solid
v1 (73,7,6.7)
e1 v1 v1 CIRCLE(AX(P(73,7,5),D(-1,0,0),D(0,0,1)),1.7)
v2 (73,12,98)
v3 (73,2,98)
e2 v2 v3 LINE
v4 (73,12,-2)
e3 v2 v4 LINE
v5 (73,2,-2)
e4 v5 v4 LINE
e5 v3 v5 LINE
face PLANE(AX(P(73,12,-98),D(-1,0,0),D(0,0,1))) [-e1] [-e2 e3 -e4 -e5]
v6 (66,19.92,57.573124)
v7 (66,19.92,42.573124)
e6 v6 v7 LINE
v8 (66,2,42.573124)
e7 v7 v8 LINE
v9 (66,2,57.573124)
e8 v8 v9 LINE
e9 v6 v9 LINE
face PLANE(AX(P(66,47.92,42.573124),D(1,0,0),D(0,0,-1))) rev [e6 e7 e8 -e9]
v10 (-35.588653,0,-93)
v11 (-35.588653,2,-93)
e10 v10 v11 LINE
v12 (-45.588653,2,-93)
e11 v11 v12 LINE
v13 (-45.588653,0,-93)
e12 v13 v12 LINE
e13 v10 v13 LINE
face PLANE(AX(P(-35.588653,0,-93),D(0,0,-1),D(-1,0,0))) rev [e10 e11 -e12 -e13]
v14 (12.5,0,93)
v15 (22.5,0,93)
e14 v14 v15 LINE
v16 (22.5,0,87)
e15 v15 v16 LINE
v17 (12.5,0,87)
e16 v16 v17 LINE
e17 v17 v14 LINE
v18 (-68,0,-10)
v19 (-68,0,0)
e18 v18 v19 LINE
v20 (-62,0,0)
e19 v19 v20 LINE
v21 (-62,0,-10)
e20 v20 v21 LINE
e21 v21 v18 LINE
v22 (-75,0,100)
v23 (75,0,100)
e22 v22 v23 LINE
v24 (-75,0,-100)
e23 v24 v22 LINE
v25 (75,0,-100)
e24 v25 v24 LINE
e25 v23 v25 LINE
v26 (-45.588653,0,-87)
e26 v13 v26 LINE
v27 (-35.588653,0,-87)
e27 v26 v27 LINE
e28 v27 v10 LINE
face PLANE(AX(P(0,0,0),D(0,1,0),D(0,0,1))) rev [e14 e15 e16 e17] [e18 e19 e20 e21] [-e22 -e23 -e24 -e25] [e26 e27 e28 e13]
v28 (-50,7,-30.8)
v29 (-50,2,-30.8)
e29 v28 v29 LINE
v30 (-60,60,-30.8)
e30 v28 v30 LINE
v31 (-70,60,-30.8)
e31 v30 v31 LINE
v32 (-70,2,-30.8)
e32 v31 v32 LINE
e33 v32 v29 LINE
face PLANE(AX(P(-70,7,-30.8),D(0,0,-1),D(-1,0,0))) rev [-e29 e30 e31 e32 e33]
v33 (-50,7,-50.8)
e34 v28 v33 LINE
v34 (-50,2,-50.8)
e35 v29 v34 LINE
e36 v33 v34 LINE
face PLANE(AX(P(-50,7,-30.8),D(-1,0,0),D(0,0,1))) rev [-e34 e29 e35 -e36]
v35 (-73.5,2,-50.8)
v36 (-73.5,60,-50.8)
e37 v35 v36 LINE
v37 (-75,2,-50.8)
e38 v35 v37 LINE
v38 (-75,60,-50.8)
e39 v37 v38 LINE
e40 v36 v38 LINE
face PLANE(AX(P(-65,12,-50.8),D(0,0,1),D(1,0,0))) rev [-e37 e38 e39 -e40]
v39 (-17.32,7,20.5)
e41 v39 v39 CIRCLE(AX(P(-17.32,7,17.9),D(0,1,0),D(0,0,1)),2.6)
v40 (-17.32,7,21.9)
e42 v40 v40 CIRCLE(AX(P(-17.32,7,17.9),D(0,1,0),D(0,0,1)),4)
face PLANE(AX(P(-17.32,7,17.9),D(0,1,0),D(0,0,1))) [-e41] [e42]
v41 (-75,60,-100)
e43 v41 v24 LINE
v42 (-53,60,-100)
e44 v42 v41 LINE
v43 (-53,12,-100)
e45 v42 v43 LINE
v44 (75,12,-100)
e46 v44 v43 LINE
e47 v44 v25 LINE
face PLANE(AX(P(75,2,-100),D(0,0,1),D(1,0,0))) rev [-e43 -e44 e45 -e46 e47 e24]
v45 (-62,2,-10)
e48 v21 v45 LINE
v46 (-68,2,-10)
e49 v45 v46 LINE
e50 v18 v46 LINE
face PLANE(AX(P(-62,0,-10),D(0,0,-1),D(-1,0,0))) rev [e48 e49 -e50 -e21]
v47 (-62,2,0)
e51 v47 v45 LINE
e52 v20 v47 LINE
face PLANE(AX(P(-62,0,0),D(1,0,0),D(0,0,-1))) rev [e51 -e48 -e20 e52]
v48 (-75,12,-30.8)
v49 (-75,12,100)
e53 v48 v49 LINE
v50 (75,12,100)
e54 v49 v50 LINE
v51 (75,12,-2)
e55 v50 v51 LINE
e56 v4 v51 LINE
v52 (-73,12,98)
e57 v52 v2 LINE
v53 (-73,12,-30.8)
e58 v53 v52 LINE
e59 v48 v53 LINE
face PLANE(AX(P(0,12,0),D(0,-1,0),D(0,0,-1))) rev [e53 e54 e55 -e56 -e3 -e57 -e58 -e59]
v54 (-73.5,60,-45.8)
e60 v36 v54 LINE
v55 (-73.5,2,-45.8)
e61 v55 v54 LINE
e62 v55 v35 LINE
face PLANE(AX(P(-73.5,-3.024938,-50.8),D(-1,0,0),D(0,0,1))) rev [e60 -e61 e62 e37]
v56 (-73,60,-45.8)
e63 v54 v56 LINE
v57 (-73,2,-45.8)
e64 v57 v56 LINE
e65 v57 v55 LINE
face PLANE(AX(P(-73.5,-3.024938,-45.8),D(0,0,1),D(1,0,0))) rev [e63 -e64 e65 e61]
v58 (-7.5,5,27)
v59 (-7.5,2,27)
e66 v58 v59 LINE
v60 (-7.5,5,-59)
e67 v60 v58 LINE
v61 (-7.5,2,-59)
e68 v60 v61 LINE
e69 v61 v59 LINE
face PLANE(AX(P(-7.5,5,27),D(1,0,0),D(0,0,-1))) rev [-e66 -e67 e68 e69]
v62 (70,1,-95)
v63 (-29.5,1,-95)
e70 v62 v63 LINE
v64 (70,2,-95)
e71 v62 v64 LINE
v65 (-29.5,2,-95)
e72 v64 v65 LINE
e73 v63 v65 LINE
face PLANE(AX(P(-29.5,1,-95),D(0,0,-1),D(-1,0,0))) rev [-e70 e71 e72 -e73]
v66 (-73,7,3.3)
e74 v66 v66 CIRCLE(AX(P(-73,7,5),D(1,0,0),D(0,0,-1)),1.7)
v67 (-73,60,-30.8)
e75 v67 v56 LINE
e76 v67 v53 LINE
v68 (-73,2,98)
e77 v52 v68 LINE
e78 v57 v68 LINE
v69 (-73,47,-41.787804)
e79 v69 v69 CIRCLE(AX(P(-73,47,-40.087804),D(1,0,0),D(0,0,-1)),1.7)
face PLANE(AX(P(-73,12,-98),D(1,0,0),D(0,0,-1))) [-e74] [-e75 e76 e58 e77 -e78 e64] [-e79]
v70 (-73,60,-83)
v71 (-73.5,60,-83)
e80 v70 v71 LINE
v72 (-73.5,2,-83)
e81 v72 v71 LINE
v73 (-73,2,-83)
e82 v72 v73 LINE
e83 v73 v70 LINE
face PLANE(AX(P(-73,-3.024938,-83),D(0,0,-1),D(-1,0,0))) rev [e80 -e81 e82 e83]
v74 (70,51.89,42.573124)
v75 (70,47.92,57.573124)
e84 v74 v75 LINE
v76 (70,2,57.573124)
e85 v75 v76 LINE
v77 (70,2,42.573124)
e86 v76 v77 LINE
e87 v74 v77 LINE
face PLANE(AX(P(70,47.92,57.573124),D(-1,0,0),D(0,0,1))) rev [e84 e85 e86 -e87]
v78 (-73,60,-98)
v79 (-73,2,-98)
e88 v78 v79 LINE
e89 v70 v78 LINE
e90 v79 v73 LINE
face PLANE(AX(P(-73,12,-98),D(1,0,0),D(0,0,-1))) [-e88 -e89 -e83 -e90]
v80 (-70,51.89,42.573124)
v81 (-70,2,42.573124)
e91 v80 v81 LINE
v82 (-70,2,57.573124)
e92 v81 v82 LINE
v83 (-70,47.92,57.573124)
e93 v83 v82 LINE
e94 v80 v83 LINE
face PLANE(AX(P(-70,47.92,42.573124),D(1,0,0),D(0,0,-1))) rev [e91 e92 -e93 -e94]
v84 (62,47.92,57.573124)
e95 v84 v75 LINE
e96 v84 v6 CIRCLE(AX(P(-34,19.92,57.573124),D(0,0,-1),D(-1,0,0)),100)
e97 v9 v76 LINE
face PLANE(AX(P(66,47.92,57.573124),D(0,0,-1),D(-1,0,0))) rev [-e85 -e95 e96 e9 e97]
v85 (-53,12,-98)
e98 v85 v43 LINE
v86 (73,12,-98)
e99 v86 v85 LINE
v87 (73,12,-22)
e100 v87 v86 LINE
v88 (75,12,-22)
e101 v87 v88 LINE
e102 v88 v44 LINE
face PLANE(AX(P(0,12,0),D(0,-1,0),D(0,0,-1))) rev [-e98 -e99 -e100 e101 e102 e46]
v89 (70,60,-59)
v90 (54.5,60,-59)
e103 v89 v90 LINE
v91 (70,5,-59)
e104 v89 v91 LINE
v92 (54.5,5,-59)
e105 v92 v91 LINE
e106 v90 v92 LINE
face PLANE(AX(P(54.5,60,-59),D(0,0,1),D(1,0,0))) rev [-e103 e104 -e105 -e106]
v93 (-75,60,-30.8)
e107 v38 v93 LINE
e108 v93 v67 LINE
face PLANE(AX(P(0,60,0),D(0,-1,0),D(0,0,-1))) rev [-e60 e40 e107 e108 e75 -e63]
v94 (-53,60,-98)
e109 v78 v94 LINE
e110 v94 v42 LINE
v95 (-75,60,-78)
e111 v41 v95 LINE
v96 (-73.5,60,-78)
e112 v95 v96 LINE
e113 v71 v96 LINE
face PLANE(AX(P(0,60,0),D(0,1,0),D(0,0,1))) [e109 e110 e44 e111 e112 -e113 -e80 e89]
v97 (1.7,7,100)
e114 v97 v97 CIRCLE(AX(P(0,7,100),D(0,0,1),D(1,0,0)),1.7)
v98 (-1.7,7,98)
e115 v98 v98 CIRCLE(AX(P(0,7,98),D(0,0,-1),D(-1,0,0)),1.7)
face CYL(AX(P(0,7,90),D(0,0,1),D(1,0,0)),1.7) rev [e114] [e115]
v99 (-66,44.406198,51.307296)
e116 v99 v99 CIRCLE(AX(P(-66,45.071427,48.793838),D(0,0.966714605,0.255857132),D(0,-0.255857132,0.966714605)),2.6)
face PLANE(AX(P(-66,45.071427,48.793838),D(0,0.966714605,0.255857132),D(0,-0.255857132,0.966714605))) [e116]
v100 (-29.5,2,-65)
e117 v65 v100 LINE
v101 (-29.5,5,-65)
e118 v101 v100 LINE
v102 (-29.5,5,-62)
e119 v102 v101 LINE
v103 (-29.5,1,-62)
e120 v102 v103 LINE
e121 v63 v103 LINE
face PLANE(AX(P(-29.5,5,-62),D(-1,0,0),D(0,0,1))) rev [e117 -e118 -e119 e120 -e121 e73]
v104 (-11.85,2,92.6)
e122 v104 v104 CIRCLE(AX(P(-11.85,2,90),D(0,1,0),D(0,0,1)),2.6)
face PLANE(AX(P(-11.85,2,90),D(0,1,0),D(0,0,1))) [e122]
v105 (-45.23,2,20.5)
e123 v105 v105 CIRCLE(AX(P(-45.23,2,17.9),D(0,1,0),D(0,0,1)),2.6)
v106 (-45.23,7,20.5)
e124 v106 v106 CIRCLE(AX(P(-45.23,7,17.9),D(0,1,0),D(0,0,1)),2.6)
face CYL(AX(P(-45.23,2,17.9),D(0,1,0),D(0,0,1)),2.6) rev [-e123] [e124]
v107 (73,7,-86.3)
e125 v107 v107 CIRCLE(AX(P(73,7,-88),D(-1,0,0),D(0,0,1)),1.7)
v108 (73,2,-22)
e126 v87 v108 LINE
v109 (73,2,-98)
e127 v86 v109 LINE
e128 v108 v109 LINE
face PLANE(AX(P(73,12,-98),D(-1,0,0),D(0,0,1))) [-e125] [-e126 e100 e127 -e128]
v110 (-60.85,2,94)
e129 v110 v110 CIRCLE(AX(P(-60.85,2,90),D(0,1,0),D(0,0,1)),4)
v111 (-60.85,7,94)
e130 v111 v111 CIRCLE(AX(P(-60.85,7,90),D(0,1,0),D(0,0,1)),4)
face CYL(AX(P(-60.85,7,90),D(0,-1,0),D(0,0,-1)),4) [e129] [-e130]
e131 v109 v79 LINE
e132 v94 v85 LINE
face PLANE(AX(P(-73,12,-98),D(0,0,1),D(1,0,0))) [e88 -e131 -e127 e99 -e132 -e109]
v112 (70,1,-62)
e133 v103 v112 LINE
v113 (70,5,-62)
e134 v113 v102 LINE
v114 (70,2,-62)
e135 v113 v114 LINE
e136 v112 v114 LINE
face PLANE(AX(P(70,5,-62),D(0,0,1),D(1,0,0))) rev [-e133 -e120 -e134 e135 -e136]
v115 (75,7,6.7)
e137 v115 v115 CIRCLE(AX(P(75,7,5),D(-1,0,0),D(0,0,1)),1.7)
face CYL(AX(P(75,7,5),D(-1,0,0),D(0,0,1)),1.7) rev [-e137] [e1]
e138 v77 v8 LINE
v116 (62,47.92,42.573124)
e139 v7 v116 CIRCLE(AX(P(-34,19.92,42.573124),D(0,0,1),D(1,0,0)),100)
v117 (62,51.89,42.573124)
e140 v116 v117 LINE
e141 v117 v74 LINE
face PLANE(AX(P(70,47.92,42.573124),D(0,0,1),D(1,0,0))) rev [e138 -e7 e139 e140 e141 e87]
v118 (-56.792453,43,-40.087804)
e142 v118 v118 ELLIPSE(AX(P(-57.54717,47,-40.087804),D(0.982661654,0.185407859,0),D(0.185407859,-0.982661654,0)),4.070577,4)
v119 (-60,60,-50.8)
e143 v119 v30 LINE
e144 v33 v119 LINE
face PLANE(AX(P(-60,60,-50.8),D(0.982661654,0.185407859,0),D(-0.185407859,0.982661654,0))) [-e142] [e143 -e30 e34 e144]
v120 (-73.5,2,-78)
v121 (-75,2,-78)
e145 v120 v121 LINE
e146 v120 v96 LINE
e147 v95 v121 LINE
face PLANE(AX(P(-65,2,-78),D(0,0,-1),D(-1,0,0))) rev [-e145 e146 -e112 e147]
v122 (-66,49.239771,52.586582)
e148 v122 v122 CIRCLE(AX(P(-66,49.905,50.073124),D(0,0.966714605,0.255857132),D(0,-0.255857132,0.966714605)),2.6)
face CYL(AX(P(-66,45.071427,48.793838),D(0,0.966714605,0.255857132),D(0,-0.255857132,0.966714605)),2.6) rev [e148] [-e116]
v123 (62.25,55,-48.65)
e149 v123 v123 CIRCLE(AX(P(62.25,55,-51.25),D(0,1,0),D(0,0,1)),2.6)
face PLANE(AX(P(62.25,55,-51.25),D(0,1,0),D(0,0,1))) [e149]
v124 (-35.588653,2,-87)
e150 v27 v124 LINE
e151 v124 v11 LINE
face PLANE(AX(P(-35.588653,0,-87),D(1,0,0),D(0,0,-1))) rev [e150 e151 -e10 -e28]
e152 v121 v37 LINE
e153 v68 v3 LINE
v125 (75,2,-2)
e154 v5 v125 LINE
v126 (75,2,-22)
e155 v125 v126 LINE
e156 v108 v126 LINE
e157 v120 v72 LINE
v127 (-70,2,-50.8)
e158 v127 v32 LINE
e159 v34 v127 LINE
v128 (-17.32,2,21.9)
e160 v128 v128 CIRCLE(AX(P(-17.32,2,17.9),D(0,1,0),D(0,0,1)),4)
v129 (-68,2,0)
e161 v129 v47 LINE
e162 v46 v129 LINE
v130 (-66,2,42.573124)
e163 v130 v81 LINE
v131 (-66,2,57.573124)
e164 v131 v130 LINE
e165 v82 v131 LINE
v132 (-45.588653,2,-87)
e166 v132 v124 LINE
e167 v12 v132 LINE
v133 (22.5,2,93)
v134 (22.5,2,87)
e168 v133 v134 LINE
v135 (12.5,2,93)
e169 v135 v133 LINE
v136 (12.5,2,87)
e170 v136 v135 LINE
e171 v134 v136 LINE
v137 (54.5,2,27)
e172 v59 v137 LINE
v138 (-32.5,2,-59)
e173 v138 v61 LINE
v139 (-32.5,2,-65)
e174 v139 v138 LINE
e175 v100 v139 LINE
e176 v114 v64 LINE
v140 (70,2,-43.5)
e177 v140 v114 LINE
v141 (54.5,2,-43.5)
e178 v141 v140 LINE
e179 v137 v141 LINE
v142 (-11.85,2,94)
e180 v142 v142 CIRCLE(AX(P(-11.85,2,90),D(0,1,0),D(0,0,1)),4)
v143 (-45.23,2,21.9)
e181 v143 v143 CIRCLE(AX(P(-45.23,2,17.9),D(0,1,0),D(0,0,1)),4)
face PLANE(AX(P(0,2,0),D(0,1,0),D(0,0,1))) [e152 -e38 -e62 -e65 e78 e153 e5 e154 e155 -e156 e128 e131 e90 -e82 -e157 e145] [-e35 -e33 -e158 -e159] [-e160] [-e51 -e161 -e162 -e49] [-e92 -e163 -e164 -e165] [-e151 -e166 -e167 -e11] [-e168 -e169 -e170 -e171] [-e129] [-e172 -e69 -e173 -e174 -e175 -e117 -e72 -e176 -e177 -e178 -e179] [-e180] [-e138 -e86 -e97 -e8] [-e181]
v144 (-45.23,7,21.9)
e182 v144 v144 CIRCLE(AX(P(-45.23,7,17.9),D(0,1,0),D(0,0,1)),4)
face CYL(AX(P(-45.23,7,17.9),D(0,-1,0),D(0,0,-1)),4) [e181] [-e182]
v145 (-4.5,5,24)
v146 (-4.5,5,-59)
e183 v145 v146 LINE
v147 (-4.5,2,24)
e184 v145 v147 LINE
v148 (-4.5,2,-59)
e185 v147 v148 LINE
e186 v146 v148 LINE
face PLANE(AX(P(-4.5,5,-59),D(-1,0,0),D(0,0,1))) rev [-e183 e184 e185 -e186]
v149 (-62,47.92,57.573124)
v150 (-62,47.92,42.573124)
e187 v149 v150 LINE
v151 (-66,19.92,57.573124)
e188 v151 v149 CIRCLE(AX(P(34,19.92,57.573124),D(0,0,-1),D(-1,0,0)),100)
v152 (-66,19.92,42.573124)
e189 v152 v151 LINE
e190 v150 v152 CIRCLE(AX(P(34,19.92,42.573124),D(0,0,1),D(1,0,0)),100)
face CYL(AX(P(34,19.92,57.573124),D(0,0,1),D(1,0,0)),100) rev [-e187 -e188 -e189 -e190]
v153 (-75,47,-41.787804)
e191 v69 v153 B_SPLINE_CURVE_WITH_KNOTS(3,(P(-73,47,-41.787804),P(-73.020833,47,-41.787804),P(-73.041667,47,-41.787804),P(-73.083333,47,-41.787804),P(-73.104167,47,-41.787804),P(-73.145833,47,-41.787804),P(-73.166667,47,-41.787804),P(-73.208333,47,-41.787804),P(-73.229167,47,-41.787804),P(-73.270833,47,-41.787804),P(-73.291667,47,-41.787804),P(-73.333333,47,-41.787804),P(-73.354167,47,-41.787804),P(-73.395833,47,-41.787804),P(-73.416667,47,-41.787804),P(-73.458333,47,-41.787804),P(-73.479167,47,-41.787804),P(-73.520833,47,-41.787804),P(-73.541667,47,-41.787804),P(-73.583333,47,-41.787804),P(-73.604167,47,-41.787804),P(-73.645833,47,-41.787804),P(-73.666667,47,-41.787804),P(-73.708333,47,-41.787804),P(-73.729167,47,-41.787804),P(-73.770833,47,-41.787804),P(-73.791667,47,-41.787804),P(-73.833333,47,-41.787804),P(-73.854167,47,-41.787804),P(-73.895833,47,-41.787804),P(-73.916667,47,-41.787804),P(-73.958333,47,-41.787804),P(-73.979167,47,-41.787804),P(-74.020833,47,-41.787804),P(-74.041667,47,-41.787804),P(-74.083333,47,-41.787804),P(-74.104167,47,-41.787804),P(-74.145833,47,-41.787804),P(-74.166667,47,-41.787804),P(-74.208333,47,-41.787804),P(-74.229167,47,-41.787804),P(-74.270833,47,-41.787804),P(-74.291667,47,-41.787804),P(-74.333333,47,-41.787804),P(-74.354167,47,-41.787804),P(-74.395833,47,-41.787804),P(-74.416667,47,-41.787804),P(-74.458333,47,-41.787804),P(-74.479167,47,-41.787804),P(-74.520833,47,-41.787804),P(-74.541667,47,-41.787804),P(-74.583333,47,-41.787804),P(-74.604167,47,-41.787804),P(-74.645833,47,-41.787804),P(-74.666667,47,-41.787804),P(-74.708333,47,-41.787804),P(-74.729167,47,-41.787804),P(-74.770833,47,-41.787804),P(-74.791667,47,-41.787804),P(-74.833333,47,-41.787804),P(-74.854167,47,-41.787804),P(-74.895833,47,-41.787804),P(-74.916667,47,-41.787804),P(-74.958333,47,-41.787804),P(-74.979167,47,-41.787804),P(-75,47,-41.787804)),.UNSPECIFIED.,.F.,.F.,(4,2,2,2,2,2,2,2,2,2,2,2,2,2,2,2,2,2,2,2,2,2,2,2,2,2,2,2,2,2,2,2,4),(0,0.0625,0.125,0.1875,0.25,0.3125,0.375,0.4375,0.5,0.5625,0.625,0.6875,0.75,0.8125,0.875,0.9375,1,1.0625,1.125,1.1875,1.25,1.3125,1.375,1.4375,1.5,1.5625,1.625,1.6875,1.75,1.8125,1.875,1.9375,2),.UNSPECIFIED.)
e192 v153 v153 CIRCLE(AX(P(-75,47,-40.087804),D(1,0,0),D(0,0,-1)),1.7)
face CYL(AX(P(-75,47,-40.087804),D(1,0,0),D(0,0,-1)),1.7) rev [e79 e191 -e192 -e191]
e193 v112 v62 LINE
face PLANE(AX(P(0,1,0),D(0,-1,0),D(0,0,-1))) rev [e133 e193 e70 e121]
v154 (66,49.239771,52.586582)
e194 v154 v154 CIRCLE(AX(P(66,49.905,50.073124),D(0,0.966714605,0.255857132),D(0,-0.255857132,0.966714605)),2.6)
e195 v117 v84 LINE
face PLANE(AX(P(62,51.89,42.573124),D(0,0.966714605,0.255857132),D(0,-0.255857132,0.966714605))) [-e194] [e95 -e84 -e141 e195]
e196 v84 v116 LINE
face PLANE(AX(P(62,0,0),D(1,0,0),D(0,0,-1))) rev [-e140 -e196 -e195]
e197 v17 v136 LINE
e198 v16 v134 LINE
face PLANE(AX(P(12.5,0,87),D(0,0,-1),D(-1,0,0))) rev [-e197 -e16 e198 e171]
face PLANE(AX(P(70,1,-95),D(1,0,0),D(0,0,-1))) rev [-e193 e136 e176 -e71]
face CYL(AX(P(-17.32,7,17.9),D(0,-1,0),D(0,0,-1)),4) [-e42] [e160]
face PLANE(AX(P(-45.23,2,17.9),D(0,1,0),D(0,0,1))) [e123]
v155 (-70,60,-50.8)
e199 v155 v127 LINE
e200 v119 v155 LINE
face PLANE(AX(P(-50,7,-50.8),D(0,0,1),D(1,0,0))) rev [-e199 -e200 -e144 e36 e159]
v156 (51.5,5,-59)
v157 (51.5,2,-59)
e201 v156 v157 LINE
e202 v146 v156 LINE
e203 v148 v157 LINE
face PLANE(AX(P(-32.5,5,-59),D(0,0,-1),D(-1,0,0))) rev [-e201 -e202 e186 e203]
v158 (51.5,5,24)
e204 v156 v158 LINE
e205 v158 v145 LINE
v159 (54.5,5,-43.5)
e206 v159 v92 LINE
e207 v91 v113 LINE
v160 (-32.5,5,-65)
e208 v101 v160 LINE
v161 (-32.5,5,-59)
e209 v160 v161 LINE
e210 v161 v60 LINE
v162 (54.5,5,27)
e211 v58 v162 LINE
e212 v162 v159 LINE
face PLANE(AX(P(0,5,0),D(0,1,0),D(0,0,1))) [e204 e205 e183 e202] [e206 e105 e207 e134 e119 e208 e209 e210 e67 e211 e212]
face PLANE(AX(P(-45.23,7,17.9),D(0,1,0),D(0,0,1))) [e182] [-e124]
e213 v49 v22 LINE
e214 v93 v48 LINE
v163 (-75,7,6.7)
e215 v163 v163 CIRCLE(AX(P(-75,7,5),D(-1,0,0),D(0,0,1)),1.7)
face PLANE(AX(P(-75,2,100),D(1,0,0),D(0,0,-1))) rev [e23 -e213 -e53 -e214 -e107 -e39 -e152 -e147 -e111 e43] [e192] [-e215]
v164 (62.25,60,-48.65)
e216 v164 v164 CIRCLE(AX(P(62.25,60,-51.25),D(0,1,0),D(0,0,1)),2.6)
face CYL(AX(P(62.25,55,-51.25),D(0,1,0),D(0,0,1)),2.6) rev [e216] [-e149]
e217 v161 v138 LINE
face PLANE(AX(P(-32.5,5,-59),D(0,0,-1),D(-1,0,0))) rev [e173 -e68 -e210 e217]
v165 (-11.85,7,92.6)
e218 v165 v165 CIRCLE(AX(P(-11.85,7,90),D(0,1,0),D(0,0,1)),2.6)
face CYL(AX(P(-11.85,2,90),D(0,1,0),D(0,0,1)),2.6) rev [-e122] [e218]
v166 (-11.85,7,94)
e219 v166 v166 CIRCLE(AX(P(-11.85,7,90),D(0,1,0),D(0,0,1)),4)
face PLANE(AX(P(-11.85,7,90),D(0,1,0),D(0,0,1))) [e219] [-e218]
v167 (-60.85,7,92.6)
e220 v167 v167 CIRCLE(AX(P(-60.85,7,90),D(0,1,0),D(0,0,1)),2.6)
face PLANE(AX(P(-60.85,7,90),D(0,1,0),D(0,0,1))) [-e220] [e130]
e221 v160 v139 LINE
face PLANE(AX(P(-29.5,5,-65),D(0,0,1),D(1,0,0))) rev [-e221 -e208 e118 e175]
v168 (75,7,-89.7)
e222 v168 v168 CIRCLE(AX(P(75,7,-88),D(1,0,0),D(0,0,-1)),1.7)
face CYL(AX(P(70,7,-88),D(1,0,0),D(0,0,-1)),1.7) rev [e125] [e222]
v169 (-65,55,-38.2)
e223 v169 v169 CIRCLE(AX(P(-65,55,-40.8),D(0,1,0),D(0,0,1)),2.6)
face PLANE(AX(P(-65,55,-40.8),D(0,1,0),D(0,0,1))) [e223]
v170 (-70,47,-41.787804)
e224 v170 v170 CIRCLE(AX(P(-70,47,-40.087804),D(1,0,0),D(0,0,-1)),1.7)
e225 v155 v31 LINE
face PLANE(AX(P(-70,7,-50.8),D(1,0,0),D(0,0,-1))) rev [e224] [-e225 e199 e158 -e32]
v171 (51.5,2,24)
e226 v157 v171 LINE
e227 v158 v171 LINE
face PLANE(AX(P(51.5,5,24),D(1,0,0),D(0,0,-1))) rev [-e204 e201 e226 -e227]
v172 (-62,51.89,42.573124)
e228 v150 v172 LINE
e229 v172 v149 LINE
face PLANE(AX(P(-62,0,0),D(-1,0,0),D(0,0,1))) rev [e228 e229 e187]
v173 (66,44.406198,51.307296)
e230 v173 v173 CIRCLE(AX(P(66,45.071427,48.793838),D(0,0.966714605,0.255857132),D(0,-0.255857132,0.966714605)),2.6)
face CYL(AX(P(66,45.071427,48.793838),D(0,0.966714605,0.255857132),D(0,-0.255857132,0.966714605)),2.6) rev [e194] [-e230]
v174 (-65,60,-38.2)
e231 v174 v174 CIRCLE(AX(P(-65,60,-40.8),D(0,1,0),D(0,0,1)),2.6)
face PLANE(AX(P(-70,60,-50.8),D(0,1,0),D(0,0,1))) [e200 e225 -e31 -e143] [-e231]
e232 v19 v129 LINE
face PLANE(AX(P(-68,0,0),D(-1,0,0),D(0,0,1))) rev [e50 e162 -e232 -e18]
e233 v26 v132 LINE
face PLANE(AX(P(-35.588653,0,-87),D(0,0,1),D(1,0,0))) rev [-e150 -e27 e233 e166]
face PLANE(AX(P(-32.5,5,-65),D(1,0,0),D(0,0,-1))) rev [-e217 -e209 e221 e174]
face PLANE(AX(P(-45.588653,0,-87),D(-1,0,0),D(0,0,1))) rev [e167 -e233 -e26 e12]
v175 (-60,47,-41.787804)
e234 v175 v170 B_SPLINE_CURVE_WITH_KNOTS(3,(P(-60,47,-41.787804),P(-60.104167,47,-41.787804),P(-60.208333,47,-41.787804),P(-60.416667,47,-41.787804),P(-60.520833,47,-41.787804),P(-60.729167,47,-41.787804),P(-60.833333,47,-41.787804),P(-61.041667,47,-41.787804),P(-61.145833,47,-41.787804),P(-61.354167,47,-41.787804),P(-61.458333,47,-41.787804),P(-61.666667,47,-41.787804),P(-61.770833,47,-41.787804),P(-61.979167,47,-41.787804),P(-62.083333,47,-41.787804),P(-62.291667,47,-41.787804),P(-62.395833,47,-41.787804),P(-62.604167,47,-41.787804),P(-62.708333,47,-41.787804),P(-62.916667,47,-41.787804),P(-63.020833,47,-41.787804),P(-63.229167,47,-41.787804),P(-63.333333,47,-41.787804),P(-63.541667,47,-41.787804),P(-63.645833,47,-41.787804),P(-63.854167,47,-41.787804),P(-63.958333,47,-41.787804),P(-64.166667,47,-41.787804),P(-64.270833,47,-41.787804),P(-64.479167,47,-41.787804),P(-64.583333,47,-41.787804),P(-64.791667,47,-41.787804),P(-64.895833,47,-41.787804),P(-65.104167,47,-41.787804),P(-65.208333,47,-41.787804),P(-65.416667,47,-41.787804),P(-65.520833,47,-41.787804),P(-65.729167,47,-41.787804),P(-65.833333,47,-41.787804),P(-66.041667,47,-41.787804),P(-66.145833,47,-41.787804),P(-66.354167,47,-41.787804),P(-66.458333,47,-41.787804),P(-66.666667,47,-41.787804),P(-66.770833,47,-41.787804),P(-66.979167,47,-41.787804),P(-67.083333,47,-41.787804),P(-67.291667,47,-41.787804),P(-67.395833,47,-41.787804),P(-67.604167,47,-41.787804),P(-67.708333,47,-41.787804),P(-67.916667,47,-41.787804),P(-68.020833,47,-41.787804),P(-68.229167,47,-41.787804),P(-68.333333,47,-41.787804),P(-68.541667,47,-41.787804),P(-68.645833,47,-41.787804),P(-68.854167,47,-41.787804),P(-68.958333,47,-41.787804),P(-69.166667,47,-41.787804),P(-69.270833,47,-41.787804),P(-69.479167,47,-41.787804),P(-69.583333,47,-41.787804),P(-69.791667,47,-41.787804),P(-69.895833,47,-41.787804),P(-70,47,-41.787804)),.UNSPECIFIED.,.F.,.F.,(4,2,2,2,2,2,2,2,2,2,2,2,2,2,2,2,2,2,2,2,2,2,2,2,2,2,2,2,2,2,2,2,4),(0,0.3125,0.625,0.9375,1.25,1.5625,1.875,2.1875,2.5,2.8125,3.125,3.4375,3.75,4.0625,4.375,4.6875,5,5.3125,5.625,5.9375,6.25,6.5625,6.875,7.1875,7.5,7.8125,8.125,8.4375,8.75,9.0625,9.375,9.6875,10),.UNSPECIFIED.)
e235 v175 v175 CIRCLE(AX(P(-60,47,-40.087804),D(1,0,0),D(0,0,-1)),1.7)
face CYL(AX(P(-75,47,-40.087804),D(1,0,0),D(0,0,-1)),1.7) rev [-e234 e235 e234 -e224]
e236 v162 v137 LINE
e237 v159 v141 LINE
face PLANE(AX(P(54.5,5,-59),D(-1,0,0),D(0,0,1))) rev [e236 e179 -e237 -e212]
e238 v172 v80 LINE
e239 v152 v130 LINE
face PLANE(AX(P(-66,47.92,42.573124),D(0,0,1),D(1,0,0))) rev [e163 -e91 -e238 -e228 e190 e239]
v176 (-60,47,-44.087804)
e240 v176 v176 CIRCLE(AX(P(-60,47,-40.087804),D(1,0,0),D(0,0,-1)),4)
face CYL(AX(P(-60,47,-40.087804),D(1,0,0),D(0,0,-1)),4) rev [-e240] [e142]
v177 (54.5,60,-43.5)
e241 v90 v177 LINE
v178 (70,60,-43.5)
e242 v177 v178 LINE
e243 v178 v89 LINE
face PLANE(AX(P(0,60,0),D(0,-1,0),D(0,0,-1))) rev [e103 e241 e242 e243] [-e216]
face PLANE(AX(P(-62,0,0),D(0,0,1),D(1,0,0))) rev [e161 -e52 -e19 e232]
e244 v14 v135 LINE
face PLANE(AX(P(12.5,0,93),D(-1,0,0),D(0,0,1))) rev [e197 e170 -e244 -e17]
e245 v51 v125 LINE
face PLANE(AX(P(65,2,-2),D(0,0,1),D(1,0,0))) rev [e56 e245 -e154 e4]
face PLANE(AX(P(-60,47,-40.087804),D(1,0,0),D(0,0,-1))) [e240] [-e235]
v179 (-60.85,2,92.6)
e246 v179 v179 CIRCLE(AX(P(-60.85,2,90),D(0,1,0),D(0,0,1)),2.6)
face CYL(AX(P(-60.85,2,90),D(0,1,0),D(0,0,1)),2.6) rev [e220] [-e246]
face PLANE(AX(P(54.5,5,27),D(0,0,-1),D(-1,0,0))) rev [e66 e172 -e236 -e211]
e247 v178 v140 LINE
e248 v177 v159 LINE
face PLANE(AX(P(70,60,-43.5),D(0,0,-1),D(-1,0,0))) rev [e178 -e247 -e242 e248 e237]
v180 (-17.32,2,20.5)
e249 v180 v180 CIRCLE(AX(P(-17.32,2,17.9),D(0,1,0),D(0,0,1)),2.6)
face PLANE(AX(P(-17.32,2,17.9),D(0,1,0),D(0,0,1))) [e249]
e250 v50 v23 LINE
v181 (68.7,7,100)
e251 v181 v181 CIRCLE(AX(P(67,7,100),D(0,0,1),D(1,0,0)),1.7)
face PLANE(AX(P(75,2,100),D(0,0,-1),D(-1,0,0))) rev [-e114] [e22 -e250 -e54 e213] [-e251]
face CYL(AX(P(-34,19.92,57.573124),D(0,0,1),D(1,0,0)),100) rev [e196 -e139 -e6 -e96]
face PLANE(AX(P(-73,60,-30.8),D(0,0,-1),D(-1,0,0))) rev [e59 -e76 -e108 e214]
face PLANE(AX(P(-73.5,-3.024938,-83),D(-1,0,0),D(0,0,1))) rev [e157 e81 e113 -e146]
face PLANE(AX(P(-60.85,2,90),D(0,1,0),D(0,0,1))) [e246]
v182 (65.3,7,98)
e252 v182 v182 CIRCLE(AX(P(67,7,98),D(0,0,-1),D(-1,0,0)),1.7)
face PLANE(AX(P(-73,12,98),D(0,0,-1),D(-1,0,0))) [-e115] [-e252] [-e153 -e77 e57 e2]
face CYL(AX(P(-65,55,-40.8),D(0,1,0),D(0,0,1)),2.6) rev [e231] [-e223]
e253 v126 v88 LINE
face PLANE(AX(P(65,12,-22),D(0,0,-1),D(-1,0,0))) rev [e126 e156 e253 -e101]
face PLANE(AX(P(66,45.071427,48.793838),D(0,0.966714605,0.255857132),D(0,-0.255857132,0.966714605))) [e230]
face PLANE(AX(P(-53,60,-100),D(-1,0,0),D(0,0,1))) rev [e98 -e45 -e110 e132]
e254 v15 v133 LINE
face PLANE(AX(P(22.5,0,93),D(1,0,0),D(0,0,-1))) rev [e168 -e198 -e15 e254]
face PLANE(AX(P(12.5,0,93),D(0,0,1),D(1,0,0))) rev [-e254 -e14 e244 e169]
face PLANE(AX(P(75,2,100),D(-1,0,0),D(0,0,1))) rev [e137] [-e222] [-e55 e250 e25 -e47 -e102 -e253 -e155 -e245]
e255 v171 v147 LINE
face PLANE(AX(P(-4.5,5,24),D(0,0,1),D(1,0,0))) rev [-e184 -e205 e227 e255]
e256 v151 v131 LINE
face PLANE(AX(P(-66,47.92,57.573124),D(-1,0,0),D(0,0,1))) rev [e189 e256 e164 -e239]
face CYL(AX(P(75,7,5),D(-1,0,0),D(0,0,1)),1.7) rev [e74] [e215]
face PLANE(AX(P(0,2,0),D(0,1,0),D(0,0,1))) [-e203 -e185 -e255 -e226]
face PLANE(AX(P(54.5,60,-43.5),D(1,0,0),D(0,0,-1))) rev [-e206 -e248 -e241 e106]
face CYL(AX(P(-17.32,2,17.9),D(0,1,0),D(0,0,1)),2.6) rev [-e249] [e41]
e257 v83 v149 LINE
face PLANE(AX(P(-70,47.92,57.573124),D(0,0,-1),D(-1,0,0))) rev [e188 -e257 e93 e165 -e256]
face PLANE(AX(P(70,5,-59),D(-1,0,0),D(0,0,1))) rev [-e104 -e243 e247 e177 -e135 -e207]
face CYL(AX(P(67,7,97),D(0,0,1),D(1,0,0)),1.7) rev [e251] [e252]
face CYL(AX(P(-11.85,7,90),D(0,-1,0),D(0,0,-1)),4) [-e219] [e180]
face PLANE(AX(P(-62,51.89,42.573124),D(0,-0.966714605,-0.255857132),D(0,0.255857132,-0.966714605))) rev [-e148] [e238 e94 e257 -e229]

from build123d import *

# Parameters (mm, degrees)
SKETCH1_W                 = 150
SKETCH1_H                 = 200
BOSS_EXTRUDE1_DEPTH       = 2
SKETCH2_W                 = 6
SKETCH2_H                 = 10
SKETCH2_W_2               = 10
SKETCH2_H_2               = 6
CUT_EXTRUDE1_DEPTH        = 126.015998976
SKETCH5_W                 = 146
SKETCH5_H                 = 196
BOSS_EXTRUDE2_DEPTH       = 10
SKETCH6_W                 = 27.2
SKETCH6_H                 = 10
CUT_EXTRUDE2_DEPTH        = 10
SKETCH8_R                 = 1.7
CUT_EXTRUDE4_DEPTH        = 181.676506497
SKETCH10_W                = 20
SKETCH10_H                = 10
CUT_EXTRUDE6_DEPTH        = 10
SKETCH15_R                = 1.7
CUT_EXTRUDE7_DEPTH        = 10
SKETCH16_R                = 1.7
CUT_EXTRUDE8_DEPTH        = 3
SKETCH19_R                = 4
BOSS_EXTRUDE3_DEPTH       = 5
SKETCH20_R                = 2.6
CUT_EXTRUDE10_DEPTH       = 5
BOSS_EXTRUDE4_DEPTH       = 3
SKETCH22_W                = 2
SKETCH22_H                = 20
BOSS_EXTRUDE5_DEPTH       = 48
SKETCH25_W                = 0.5
SKETCH25_H                = 5
CUT_EXTRUDE13_DEPTH       = 58
SKETCH26_R                = 1.7
CUT_EXTRUDE15_DEPTH       = 5
SKETCH27_W                = 20
SKETCH27_H                = 20
BOSS_EXTRUDE6_DEPTH       = 5
BOSS_EXTRUDE7_DEPTH       = 20
SKETCH29_R                = 4
CUT_EXTRUDE16_DEPTH       = 10
SKETCH31_R                = 1.7
CUT_EXTRUDE17_DEPTH       = 179.395627749
BOSS_EXTRUDE9_DEPTH       = 3
SKETCH35_W                = 15.5
SKETCH35_H                = 15.5
BOSS_EXTRUDE10_DEPTH      = 58
SKETCH36_R                = 2.6
CUT_EXTRUDE20_DEPTH       = 5
SKETCH38_R                = 2.6
CUT_EXTRUDE21_DEPTH       = 5
SKETCH37_W                = 4
SKETCH37_H                = 15
BOSS_EXTRUDE11_DEPTH      = 45.92
BOSS_EXTRUDE12_DEPTH      = 4
BOSS_EXTRUDE12_DEPTH_BACK = 4
FILLET1_R                 = 100
BOSS_EXTRUDE13_DEPTH      = 8
FILLET2_R                 = 100
SKETCH41_R                = 2.6
CUT_EXTRUDE22_DEPTH       = 5
SKETCH42_W                = 99.5
SKETCH42_H                = 33
CUT_EXTRUDE23_DEPTH       = 1


with BuildPart() as part:
    # Sketch1 → Boss-Extrude1 (new body)
    with BuildSketch(Plane(origin=(0, 0, 0), x_dir=(1, 0, 0), z_dir=(0, 1, 0))):
        Rectangle(SKETCH1_W, SKETCH1_H)
    extrude(amount=BOSS_EXTRUDE1_DEPTH)

    # Sketch2 → Cut-Extrude1 (cut, through all)
    with BuildSketch(Plane(origin=(0, 2, 0), x_dir=(1, 0, 0), z_dir=(0, 1, 0))):
        with Locations((-65, 5)):
            Rectangle(SKETCH2_W, SKETCH2_H)
        with Locations((17.5, -90)):
            Rectangle(SKETCH2_W_2, SKETCH2_H_2)
        with Locations((-40.588652837, 90)):
            Rectangle(SKETCH2_W_2, SKETCH2_H_2)
    extrude(amount=-CUT_EXTRUDE1_DEPTH, mode=Mode.SUBTRACT)

    # Sketch5 → Boss-Extrude2 (add)
    with BuildSketch(Plane(origin=(0, 2, 0), x_dir=(1, 0, 0), z_dir=(0, 1, 0))):
        Polygon((-75, 100), (-75, -100), (75, -100), (75, -98), (75, 98), (75, 100), align=None)
        Rectangle(SKETCH5_W, SKETCH5_H, mode=Mode.SUBTRACT)
    extrude(amount=BOSS_EXTRUDE2_DEPTH)

    # Sketch6 → Cut-Extrude2 (cut)
    with BuildSketch(Plane.ZY.offset(75)):
        with Locations((-64.4, 7)):
            Rectangle(SKETCH6_W, SKETCH6_H)
    extrude(amount=-CUT_EXTRUDE2_DEPTH, mode=Mode.SUBTRACT)

    # Sketch8 → Cut-Extrude4 (cut, through all)
    with BuildSketch(Plane.ZY.offset(75)):
        with Locations((5, 7)):
            Circle(SKETCH8_R)
    extrude(amount=-CUT_EXTRUDE4_DEPTH, mode=Mode.SUBTRACT)

    # Sketch10 → Cut-Extrude6 (cut)
    with BuildSketch(Plane(origin=(75, 0, 0), x_dir=(0, 0, -1), z_dir=(1, 0, 0))):
        with Locations((12, 7)):
            Rectangle(SKETCH10_W, SKETCH10_H)
    extrude(amount=-CUT_EXTRUDE6_DEPTH, mode=Mode.SUBTRACT)

    # Sketch15 → Cut-Extrude7 (cut)
    with BuildSketch(Plane.XY.offset(100)):
        with Locations((0, 7)):
            Circle(SKETCH15_R)
    extrude(amount=-CUT_EXTRUDE7_DEPTH, mode=Mode.SUBTRACT)

    # Sketch16 → Cut-Extrude8 (cut)
    with BuildSketch(Plane.XY.offset(100)):
        with Locations((67, 7)):
            Circle(SKETCH16_R)
    extrude(amount=-CUT_EXTRUDE8_DEPTH, mode=Mode.SUBTRACT)

    # Sketch19 → Boss-Extrude3 (add)
    with BuildSketch(Plane(origin=(0, 2, 0), x_dir=(1, 0, 0), z_dir=(0, 1, 0))):
        with Locations(Location((-60.85, -90, 0), (0, 0, 270))):
            Circle(SKETCH19_R)
        with Locations(Location((-11.85, -90, 0), (0, 0, 270))):
            Circle(SKETCH19_R)
        with Locations(Location((-45.23, -17.9, 0), (0, 0, 270))):
            Circle(SKETCH19_R)
        with Locations(Location((-17.32, -17.9, 0), (0, 0, 270))):
            Circle(SKETCH19_R)
    extrude(amount=BOSS_EXTRUDE3_DEPTH)

    # Sketch20 → Cut-Extrude10 (cut)
    with BuildSketch(Plane(origin=(0, 7, 0), x_dir=(1, 0, 0), z_dir=(0, 1, 0))):
        with Locations(Location((-45.23, -17.9, 0), (0, 0, 270))):
            Circle(SKETCH20_R)
        with Locations(Location((-17.32, -17.9, 0), (0, 0, 270))):
            Circle(SKETCH20_R)
        with Locations(Location((-11.85, -90, 0), (0, 0, 270))):
            Circle(SKETCH20_R)
        with Locations(Location((-60.85, -90, 0), (0, 0, 270))):
            Circle(SKETCH20_R)
    extrude(amount=-CUT_EXTRUDE10_DEPTH, mode=Mode.SUBTRACT)

    # Sketch21 → Boss-Extrude4 (add)
    with BuildSketch(Plane(origin=(0, 2, 0), x_dir=(1, 0, 0), z_dir=(0, 1, 0))):
        Polygon((-29.5, 65), (-32.5, 65), (-32.5, 59), (70, 59), (70, 62), (-29.5, 62), align=None)
    extrude(amount=BOSS_EXTRUDE4_DEPTH)

    # Sketch22 → Boss-Extrude5 (add)
    with BuildSketch(Plane(origin=(0, 12, 0), x_dir=(1, 0, 0), z_dir=(0, 1, 0))):
        with Locations((-74, 40.8)):
            Rectangle(SKETCH22_W, SKETCH22_H)
        Polygon((-75, 100), (-53, 100), (-53, 98), (-73, 98), (-73, 78), (-75, 78), align=None)
    extrude(amount=BOSS_EXTRUDE5_DEPTH)

    # Sketch25 → Cut-Extrude13 (cut)
    with BuildSketch(Plane(origin=(0, 60, 0), x_dir=(1, 0, 0), z_dir=(0, 1, 0))):
        with Locations((-73.25, 80.5)):
            Rectangle(SKETCH25_W, SKETCH25_H)
        with Locations((-73.25, 48.3)):
            Rectangle(SKETCH25_W, SKETCH25_H)
    extrude(amount=-CUT_EXTRUDE13_DEPTH, mode=Mode.SUBTRACT)

    # Sketch26 → Cut-Extrude15 (cut)
    with BuildSketch(Plane(origin=(75, 0, 0), x_dir=(0, 0, -1), z_dir=(1, 0, 0))):
        with Locations((88, 7)):
            Circle(SKETCH26_R)
    extrude(amount=-CUT_EXTRUDE15_DEPTH, mode=Mode.SUBTRACT)

    # Sketch27 → Boss-Extrude6 (add)
    with BuildSketch(Plane(origin=(0, 2, 0), x_dir=(1, 0, 0), z_dir=(0, 1, 0))):
        with Locations((-60, 40.8)):
            Rectangle(SKETCH27_W, SKETCH27_H)
    extrude(amount=BOSS_EXTRUDE6_DEPTH)

    # Sketch28 → Boss-Extrude7 (add)
    with BuildSketch(Plane.XY.offset(-30.8)):
        Polygon((-70, 7), (-70, 60), (-60, 60), (-50, 7), align=None)
    extrude(amount=-BOSS_EXTRUDE7_DEPTH)

    # Sketch29 → Cut-Extrude16 (cut)
    with BuildSketch(Plane(origin=(-50, 0, 0), x_dir=(0, 0, -1), z_dir=(1, 0, 0))):
        with Locations((40.087803788, 47)):
            Circle(SKETCH29_R)
    extrude(amount=-CUT_EXTRUDE16_DEPTH, mode=Mode.SUBTRACT)

    # Sketch31 → Cut-Extrude17 (cut, through all)
    with BuildSketch(Plane(origin=(-60, 0, 0), x_dir=(0, 0, -1), z_dir=(1, 0, 0))):
        with Locations((40.087803788, 47)):
            Circle(SKETCH31_R)
    extrude(amount=-CUT_EXTRUDE17_DEPTH, mode=Mode.SUBTRACT)

    # Sketch34 → Boss-Extrude9 (add)
    with BuildSketch(Plane(origin=(0, 2, 0), x_dir=(1, 0, 0), z_dir=(0, 1, 0))):
        Polygon((-4.5, 59), (-4.5, -24), (51.5, -24), (51.5, 59), (54.5, 59), (54.5, -27), (-7.5, -27), (-7.5, 59), align=None)
    extrude(amount=BOSS_EXTRUDE9_DEPTH)

    # Sketch35 → Boss-Extrude10 (add)
    with BuildSketch(Plane(origin=(0, 2, 0), x_dir=(1, 0, 0), z_dir=(0, 1, 0))):
        with Locations((62.25, 51.25)):
            Rectangle(SKETCH35_W, SKETCH35_H)
    extrude(amount=BOSS_EXTRUDE10_DEPTH)

    # Sketch36 → Cut-Extrude20 (cut)
    with BuildSketch(Plane(origin=(0, 60, 0), x_dir=(1, 0, 0), z_dir=(0, 1, 0))):
        with Locations(Location((62.25, 51.25, 0), (0, 0, 270))):
            Circle(SKETCH36_R)
    extrude(amount=-CUT_EXTRUDE20_DEPTH, mode=Mode.SUBTRACT)

    # Sketch38 → Cut-Extrude21 (cut)
    with BuildSketch(Plane(origin=(0, 60, 0), x_dir=(1, 0, 0), z_dir=(0, 1, 0))):
        with Locations(Location((-65, 40.8, 0), (0, 0, 270))):
            Circle(SKETCH38_R)
    extrude(amount=-CUT_EXTRUDE21_DEPTH, mode=Mode.SUBTRACT)

    # Sketch37 → Boss-Extrude11 (add)
    with BuildSketch(Plane(origin=(0, 2, 0), x_dir=(1, 0, 0), z_dir=(0, 1, 0))):
        with Locations((-68, -50.073123899)):
            Rectangle(SKETCH37_W, SKETCH37_H)
        with Locations((68, -50.073123899)):
            Rectangle(SKETCH37_W, SKETCH37_H)
    extrude(amount=BOSS_EXTRUDE11_DEPTH)

    # Sketch39 → Boss-Extrude12 (add, two sides: drawn at the far end of the back side and taken through both)
    with BuildSketch(Plane(origin=(-66, 0, 0), x_dir=(0, 0, -1), z_dir=(1, 0, 0)).offset(-BOSS_EXTRUDE12_DEPTH_BACK)):
        Polygon((-57.573123899, 47.92), (-42.573123899, 47.92), (-42.573123899, 51.89), align=None)
    extrude(amount=BOSS_EXTRUDE12_DEPTH + BOSS_EXTRUDE12_DEPTH_BACK)

    # Fillet1
    # the kernel refuses this fillet: 100 mm, written as the material it adds along each edge
    with BuildSketch(Plane(origin=(-66, 47.92, 57.573123899), x_dir=(1, 0, 0), z_dir=(0, 0, -1))) as fillet1_piece_1_section:
        with BuildLine():
            CenterArc((100, 28), FILLET1_R, 180, 16.260204708)
            Line((0, 28), (-2, 28))
            Line((-2, 28), (-2, 0))
            Line((-2, 0), (0, -2))
            ThreePointArc((0, -2), (2, -2), (2.08, -0.56))
            Line((2.08, -0.56), (4, 0))
        make_face()
    fillet1_piece_1 = extrude(amount=15, mode=Mode.PRIVATE)
    fillet1_piece_1 = split(fillet1_piece_1, bisect_by=Plane(origin=(-66.078013707, 49.109205827, 53.07990289), z_dir=(0, -0.9667146052036466, -0.25585713217723216)), keep=Keep.TOP, mode=Mode.PRIVATE)
    add(fillet1_piece_1)

    # Sketch40 → Boss-Extrude13 (add)
    with BuildSketch(Plane(origin=(70, 0, 0), x_dir=(0, 0, -1), z_dir=(1, 0, 0))):
        Polygon((-42.573123899, 47.92), (-42.573123899, 51.89), (-57.573123899, 47.92), align=None)
    extrude(amount=-BOSS_EXTRUDE13_DEPTH)

    # Fillet2
    # the kernel refuses this fillet: 100 mm, written as the material it adds along each edge
    with BuildSketch(Plane(origin=(66, 47.92, 42.573123899), x_dir=(-1, 0, 0), z_dir=(0, 0, 1))) as fillet2_piece_1_section:
        with BuildLine():
            CenterArc((100, 28), FILLET2_R, 180, 16.260204708)
            Line((0, 28), (-2, 28))
            Line((-2, 28), (-2, 0))
            Line((-2, 0), (0, -2))
            ThreePointArc((0, -2), (2, -2), (2.08, -0.56))
            Line((2.08, -0.56), (4, 0))
        make_face()
    fillet2_piece_1 = extrude(amount=15, mode=Mode.PRIVATE)
    fillet2_piece_1 = split(fillet2_piece_1, bisect_by=Plane(origin=(66.078013707, 49.109205827, 53.07990289), z_dir=(0, -0.9667146052036466, -0.25585713217723216)), keep=Keep.TOP, mode=Mode.PRIVATE)
    add(fillet2_piece_1)

    # Sketch41 → Cut-Extrude22 (cut)
    with BuildSketch(Plane(origin=(0, 59.02320322, 15.621474452), x_dir=(1, 0, 0), z_dir=(0, 0.9667146052036468, 0.2558571321772319))):
        with Locations(Location((-66, -35.63787002, 0), (0, 0, 270))):
            Circle(SKETCH41_R)
        with Locations(Location((66, -35.63787002, 0), (0, 0, 270))):
            Circle(SKETCH41_R)
    extrude(amount=-CUT_EXTRUDE22_DEPTH, mode=Mode.SUBTRACT)

    # Sketch42 → Cut-Extrude23 (cut)
    with BuildSketch(Plane(origin=(0, 2, 0), x_dir=(1, 0, 0), z_dir=(0, 1, 0))):
        with Locations((20.25, 78.5)):
            Rectangle(SKETCH42_W, SKETCH42_H)
    extrude(amount=-CUT_EXTRUDE23_DEPTH, mode=Mode.SUBTRACT)


solid = part.part
